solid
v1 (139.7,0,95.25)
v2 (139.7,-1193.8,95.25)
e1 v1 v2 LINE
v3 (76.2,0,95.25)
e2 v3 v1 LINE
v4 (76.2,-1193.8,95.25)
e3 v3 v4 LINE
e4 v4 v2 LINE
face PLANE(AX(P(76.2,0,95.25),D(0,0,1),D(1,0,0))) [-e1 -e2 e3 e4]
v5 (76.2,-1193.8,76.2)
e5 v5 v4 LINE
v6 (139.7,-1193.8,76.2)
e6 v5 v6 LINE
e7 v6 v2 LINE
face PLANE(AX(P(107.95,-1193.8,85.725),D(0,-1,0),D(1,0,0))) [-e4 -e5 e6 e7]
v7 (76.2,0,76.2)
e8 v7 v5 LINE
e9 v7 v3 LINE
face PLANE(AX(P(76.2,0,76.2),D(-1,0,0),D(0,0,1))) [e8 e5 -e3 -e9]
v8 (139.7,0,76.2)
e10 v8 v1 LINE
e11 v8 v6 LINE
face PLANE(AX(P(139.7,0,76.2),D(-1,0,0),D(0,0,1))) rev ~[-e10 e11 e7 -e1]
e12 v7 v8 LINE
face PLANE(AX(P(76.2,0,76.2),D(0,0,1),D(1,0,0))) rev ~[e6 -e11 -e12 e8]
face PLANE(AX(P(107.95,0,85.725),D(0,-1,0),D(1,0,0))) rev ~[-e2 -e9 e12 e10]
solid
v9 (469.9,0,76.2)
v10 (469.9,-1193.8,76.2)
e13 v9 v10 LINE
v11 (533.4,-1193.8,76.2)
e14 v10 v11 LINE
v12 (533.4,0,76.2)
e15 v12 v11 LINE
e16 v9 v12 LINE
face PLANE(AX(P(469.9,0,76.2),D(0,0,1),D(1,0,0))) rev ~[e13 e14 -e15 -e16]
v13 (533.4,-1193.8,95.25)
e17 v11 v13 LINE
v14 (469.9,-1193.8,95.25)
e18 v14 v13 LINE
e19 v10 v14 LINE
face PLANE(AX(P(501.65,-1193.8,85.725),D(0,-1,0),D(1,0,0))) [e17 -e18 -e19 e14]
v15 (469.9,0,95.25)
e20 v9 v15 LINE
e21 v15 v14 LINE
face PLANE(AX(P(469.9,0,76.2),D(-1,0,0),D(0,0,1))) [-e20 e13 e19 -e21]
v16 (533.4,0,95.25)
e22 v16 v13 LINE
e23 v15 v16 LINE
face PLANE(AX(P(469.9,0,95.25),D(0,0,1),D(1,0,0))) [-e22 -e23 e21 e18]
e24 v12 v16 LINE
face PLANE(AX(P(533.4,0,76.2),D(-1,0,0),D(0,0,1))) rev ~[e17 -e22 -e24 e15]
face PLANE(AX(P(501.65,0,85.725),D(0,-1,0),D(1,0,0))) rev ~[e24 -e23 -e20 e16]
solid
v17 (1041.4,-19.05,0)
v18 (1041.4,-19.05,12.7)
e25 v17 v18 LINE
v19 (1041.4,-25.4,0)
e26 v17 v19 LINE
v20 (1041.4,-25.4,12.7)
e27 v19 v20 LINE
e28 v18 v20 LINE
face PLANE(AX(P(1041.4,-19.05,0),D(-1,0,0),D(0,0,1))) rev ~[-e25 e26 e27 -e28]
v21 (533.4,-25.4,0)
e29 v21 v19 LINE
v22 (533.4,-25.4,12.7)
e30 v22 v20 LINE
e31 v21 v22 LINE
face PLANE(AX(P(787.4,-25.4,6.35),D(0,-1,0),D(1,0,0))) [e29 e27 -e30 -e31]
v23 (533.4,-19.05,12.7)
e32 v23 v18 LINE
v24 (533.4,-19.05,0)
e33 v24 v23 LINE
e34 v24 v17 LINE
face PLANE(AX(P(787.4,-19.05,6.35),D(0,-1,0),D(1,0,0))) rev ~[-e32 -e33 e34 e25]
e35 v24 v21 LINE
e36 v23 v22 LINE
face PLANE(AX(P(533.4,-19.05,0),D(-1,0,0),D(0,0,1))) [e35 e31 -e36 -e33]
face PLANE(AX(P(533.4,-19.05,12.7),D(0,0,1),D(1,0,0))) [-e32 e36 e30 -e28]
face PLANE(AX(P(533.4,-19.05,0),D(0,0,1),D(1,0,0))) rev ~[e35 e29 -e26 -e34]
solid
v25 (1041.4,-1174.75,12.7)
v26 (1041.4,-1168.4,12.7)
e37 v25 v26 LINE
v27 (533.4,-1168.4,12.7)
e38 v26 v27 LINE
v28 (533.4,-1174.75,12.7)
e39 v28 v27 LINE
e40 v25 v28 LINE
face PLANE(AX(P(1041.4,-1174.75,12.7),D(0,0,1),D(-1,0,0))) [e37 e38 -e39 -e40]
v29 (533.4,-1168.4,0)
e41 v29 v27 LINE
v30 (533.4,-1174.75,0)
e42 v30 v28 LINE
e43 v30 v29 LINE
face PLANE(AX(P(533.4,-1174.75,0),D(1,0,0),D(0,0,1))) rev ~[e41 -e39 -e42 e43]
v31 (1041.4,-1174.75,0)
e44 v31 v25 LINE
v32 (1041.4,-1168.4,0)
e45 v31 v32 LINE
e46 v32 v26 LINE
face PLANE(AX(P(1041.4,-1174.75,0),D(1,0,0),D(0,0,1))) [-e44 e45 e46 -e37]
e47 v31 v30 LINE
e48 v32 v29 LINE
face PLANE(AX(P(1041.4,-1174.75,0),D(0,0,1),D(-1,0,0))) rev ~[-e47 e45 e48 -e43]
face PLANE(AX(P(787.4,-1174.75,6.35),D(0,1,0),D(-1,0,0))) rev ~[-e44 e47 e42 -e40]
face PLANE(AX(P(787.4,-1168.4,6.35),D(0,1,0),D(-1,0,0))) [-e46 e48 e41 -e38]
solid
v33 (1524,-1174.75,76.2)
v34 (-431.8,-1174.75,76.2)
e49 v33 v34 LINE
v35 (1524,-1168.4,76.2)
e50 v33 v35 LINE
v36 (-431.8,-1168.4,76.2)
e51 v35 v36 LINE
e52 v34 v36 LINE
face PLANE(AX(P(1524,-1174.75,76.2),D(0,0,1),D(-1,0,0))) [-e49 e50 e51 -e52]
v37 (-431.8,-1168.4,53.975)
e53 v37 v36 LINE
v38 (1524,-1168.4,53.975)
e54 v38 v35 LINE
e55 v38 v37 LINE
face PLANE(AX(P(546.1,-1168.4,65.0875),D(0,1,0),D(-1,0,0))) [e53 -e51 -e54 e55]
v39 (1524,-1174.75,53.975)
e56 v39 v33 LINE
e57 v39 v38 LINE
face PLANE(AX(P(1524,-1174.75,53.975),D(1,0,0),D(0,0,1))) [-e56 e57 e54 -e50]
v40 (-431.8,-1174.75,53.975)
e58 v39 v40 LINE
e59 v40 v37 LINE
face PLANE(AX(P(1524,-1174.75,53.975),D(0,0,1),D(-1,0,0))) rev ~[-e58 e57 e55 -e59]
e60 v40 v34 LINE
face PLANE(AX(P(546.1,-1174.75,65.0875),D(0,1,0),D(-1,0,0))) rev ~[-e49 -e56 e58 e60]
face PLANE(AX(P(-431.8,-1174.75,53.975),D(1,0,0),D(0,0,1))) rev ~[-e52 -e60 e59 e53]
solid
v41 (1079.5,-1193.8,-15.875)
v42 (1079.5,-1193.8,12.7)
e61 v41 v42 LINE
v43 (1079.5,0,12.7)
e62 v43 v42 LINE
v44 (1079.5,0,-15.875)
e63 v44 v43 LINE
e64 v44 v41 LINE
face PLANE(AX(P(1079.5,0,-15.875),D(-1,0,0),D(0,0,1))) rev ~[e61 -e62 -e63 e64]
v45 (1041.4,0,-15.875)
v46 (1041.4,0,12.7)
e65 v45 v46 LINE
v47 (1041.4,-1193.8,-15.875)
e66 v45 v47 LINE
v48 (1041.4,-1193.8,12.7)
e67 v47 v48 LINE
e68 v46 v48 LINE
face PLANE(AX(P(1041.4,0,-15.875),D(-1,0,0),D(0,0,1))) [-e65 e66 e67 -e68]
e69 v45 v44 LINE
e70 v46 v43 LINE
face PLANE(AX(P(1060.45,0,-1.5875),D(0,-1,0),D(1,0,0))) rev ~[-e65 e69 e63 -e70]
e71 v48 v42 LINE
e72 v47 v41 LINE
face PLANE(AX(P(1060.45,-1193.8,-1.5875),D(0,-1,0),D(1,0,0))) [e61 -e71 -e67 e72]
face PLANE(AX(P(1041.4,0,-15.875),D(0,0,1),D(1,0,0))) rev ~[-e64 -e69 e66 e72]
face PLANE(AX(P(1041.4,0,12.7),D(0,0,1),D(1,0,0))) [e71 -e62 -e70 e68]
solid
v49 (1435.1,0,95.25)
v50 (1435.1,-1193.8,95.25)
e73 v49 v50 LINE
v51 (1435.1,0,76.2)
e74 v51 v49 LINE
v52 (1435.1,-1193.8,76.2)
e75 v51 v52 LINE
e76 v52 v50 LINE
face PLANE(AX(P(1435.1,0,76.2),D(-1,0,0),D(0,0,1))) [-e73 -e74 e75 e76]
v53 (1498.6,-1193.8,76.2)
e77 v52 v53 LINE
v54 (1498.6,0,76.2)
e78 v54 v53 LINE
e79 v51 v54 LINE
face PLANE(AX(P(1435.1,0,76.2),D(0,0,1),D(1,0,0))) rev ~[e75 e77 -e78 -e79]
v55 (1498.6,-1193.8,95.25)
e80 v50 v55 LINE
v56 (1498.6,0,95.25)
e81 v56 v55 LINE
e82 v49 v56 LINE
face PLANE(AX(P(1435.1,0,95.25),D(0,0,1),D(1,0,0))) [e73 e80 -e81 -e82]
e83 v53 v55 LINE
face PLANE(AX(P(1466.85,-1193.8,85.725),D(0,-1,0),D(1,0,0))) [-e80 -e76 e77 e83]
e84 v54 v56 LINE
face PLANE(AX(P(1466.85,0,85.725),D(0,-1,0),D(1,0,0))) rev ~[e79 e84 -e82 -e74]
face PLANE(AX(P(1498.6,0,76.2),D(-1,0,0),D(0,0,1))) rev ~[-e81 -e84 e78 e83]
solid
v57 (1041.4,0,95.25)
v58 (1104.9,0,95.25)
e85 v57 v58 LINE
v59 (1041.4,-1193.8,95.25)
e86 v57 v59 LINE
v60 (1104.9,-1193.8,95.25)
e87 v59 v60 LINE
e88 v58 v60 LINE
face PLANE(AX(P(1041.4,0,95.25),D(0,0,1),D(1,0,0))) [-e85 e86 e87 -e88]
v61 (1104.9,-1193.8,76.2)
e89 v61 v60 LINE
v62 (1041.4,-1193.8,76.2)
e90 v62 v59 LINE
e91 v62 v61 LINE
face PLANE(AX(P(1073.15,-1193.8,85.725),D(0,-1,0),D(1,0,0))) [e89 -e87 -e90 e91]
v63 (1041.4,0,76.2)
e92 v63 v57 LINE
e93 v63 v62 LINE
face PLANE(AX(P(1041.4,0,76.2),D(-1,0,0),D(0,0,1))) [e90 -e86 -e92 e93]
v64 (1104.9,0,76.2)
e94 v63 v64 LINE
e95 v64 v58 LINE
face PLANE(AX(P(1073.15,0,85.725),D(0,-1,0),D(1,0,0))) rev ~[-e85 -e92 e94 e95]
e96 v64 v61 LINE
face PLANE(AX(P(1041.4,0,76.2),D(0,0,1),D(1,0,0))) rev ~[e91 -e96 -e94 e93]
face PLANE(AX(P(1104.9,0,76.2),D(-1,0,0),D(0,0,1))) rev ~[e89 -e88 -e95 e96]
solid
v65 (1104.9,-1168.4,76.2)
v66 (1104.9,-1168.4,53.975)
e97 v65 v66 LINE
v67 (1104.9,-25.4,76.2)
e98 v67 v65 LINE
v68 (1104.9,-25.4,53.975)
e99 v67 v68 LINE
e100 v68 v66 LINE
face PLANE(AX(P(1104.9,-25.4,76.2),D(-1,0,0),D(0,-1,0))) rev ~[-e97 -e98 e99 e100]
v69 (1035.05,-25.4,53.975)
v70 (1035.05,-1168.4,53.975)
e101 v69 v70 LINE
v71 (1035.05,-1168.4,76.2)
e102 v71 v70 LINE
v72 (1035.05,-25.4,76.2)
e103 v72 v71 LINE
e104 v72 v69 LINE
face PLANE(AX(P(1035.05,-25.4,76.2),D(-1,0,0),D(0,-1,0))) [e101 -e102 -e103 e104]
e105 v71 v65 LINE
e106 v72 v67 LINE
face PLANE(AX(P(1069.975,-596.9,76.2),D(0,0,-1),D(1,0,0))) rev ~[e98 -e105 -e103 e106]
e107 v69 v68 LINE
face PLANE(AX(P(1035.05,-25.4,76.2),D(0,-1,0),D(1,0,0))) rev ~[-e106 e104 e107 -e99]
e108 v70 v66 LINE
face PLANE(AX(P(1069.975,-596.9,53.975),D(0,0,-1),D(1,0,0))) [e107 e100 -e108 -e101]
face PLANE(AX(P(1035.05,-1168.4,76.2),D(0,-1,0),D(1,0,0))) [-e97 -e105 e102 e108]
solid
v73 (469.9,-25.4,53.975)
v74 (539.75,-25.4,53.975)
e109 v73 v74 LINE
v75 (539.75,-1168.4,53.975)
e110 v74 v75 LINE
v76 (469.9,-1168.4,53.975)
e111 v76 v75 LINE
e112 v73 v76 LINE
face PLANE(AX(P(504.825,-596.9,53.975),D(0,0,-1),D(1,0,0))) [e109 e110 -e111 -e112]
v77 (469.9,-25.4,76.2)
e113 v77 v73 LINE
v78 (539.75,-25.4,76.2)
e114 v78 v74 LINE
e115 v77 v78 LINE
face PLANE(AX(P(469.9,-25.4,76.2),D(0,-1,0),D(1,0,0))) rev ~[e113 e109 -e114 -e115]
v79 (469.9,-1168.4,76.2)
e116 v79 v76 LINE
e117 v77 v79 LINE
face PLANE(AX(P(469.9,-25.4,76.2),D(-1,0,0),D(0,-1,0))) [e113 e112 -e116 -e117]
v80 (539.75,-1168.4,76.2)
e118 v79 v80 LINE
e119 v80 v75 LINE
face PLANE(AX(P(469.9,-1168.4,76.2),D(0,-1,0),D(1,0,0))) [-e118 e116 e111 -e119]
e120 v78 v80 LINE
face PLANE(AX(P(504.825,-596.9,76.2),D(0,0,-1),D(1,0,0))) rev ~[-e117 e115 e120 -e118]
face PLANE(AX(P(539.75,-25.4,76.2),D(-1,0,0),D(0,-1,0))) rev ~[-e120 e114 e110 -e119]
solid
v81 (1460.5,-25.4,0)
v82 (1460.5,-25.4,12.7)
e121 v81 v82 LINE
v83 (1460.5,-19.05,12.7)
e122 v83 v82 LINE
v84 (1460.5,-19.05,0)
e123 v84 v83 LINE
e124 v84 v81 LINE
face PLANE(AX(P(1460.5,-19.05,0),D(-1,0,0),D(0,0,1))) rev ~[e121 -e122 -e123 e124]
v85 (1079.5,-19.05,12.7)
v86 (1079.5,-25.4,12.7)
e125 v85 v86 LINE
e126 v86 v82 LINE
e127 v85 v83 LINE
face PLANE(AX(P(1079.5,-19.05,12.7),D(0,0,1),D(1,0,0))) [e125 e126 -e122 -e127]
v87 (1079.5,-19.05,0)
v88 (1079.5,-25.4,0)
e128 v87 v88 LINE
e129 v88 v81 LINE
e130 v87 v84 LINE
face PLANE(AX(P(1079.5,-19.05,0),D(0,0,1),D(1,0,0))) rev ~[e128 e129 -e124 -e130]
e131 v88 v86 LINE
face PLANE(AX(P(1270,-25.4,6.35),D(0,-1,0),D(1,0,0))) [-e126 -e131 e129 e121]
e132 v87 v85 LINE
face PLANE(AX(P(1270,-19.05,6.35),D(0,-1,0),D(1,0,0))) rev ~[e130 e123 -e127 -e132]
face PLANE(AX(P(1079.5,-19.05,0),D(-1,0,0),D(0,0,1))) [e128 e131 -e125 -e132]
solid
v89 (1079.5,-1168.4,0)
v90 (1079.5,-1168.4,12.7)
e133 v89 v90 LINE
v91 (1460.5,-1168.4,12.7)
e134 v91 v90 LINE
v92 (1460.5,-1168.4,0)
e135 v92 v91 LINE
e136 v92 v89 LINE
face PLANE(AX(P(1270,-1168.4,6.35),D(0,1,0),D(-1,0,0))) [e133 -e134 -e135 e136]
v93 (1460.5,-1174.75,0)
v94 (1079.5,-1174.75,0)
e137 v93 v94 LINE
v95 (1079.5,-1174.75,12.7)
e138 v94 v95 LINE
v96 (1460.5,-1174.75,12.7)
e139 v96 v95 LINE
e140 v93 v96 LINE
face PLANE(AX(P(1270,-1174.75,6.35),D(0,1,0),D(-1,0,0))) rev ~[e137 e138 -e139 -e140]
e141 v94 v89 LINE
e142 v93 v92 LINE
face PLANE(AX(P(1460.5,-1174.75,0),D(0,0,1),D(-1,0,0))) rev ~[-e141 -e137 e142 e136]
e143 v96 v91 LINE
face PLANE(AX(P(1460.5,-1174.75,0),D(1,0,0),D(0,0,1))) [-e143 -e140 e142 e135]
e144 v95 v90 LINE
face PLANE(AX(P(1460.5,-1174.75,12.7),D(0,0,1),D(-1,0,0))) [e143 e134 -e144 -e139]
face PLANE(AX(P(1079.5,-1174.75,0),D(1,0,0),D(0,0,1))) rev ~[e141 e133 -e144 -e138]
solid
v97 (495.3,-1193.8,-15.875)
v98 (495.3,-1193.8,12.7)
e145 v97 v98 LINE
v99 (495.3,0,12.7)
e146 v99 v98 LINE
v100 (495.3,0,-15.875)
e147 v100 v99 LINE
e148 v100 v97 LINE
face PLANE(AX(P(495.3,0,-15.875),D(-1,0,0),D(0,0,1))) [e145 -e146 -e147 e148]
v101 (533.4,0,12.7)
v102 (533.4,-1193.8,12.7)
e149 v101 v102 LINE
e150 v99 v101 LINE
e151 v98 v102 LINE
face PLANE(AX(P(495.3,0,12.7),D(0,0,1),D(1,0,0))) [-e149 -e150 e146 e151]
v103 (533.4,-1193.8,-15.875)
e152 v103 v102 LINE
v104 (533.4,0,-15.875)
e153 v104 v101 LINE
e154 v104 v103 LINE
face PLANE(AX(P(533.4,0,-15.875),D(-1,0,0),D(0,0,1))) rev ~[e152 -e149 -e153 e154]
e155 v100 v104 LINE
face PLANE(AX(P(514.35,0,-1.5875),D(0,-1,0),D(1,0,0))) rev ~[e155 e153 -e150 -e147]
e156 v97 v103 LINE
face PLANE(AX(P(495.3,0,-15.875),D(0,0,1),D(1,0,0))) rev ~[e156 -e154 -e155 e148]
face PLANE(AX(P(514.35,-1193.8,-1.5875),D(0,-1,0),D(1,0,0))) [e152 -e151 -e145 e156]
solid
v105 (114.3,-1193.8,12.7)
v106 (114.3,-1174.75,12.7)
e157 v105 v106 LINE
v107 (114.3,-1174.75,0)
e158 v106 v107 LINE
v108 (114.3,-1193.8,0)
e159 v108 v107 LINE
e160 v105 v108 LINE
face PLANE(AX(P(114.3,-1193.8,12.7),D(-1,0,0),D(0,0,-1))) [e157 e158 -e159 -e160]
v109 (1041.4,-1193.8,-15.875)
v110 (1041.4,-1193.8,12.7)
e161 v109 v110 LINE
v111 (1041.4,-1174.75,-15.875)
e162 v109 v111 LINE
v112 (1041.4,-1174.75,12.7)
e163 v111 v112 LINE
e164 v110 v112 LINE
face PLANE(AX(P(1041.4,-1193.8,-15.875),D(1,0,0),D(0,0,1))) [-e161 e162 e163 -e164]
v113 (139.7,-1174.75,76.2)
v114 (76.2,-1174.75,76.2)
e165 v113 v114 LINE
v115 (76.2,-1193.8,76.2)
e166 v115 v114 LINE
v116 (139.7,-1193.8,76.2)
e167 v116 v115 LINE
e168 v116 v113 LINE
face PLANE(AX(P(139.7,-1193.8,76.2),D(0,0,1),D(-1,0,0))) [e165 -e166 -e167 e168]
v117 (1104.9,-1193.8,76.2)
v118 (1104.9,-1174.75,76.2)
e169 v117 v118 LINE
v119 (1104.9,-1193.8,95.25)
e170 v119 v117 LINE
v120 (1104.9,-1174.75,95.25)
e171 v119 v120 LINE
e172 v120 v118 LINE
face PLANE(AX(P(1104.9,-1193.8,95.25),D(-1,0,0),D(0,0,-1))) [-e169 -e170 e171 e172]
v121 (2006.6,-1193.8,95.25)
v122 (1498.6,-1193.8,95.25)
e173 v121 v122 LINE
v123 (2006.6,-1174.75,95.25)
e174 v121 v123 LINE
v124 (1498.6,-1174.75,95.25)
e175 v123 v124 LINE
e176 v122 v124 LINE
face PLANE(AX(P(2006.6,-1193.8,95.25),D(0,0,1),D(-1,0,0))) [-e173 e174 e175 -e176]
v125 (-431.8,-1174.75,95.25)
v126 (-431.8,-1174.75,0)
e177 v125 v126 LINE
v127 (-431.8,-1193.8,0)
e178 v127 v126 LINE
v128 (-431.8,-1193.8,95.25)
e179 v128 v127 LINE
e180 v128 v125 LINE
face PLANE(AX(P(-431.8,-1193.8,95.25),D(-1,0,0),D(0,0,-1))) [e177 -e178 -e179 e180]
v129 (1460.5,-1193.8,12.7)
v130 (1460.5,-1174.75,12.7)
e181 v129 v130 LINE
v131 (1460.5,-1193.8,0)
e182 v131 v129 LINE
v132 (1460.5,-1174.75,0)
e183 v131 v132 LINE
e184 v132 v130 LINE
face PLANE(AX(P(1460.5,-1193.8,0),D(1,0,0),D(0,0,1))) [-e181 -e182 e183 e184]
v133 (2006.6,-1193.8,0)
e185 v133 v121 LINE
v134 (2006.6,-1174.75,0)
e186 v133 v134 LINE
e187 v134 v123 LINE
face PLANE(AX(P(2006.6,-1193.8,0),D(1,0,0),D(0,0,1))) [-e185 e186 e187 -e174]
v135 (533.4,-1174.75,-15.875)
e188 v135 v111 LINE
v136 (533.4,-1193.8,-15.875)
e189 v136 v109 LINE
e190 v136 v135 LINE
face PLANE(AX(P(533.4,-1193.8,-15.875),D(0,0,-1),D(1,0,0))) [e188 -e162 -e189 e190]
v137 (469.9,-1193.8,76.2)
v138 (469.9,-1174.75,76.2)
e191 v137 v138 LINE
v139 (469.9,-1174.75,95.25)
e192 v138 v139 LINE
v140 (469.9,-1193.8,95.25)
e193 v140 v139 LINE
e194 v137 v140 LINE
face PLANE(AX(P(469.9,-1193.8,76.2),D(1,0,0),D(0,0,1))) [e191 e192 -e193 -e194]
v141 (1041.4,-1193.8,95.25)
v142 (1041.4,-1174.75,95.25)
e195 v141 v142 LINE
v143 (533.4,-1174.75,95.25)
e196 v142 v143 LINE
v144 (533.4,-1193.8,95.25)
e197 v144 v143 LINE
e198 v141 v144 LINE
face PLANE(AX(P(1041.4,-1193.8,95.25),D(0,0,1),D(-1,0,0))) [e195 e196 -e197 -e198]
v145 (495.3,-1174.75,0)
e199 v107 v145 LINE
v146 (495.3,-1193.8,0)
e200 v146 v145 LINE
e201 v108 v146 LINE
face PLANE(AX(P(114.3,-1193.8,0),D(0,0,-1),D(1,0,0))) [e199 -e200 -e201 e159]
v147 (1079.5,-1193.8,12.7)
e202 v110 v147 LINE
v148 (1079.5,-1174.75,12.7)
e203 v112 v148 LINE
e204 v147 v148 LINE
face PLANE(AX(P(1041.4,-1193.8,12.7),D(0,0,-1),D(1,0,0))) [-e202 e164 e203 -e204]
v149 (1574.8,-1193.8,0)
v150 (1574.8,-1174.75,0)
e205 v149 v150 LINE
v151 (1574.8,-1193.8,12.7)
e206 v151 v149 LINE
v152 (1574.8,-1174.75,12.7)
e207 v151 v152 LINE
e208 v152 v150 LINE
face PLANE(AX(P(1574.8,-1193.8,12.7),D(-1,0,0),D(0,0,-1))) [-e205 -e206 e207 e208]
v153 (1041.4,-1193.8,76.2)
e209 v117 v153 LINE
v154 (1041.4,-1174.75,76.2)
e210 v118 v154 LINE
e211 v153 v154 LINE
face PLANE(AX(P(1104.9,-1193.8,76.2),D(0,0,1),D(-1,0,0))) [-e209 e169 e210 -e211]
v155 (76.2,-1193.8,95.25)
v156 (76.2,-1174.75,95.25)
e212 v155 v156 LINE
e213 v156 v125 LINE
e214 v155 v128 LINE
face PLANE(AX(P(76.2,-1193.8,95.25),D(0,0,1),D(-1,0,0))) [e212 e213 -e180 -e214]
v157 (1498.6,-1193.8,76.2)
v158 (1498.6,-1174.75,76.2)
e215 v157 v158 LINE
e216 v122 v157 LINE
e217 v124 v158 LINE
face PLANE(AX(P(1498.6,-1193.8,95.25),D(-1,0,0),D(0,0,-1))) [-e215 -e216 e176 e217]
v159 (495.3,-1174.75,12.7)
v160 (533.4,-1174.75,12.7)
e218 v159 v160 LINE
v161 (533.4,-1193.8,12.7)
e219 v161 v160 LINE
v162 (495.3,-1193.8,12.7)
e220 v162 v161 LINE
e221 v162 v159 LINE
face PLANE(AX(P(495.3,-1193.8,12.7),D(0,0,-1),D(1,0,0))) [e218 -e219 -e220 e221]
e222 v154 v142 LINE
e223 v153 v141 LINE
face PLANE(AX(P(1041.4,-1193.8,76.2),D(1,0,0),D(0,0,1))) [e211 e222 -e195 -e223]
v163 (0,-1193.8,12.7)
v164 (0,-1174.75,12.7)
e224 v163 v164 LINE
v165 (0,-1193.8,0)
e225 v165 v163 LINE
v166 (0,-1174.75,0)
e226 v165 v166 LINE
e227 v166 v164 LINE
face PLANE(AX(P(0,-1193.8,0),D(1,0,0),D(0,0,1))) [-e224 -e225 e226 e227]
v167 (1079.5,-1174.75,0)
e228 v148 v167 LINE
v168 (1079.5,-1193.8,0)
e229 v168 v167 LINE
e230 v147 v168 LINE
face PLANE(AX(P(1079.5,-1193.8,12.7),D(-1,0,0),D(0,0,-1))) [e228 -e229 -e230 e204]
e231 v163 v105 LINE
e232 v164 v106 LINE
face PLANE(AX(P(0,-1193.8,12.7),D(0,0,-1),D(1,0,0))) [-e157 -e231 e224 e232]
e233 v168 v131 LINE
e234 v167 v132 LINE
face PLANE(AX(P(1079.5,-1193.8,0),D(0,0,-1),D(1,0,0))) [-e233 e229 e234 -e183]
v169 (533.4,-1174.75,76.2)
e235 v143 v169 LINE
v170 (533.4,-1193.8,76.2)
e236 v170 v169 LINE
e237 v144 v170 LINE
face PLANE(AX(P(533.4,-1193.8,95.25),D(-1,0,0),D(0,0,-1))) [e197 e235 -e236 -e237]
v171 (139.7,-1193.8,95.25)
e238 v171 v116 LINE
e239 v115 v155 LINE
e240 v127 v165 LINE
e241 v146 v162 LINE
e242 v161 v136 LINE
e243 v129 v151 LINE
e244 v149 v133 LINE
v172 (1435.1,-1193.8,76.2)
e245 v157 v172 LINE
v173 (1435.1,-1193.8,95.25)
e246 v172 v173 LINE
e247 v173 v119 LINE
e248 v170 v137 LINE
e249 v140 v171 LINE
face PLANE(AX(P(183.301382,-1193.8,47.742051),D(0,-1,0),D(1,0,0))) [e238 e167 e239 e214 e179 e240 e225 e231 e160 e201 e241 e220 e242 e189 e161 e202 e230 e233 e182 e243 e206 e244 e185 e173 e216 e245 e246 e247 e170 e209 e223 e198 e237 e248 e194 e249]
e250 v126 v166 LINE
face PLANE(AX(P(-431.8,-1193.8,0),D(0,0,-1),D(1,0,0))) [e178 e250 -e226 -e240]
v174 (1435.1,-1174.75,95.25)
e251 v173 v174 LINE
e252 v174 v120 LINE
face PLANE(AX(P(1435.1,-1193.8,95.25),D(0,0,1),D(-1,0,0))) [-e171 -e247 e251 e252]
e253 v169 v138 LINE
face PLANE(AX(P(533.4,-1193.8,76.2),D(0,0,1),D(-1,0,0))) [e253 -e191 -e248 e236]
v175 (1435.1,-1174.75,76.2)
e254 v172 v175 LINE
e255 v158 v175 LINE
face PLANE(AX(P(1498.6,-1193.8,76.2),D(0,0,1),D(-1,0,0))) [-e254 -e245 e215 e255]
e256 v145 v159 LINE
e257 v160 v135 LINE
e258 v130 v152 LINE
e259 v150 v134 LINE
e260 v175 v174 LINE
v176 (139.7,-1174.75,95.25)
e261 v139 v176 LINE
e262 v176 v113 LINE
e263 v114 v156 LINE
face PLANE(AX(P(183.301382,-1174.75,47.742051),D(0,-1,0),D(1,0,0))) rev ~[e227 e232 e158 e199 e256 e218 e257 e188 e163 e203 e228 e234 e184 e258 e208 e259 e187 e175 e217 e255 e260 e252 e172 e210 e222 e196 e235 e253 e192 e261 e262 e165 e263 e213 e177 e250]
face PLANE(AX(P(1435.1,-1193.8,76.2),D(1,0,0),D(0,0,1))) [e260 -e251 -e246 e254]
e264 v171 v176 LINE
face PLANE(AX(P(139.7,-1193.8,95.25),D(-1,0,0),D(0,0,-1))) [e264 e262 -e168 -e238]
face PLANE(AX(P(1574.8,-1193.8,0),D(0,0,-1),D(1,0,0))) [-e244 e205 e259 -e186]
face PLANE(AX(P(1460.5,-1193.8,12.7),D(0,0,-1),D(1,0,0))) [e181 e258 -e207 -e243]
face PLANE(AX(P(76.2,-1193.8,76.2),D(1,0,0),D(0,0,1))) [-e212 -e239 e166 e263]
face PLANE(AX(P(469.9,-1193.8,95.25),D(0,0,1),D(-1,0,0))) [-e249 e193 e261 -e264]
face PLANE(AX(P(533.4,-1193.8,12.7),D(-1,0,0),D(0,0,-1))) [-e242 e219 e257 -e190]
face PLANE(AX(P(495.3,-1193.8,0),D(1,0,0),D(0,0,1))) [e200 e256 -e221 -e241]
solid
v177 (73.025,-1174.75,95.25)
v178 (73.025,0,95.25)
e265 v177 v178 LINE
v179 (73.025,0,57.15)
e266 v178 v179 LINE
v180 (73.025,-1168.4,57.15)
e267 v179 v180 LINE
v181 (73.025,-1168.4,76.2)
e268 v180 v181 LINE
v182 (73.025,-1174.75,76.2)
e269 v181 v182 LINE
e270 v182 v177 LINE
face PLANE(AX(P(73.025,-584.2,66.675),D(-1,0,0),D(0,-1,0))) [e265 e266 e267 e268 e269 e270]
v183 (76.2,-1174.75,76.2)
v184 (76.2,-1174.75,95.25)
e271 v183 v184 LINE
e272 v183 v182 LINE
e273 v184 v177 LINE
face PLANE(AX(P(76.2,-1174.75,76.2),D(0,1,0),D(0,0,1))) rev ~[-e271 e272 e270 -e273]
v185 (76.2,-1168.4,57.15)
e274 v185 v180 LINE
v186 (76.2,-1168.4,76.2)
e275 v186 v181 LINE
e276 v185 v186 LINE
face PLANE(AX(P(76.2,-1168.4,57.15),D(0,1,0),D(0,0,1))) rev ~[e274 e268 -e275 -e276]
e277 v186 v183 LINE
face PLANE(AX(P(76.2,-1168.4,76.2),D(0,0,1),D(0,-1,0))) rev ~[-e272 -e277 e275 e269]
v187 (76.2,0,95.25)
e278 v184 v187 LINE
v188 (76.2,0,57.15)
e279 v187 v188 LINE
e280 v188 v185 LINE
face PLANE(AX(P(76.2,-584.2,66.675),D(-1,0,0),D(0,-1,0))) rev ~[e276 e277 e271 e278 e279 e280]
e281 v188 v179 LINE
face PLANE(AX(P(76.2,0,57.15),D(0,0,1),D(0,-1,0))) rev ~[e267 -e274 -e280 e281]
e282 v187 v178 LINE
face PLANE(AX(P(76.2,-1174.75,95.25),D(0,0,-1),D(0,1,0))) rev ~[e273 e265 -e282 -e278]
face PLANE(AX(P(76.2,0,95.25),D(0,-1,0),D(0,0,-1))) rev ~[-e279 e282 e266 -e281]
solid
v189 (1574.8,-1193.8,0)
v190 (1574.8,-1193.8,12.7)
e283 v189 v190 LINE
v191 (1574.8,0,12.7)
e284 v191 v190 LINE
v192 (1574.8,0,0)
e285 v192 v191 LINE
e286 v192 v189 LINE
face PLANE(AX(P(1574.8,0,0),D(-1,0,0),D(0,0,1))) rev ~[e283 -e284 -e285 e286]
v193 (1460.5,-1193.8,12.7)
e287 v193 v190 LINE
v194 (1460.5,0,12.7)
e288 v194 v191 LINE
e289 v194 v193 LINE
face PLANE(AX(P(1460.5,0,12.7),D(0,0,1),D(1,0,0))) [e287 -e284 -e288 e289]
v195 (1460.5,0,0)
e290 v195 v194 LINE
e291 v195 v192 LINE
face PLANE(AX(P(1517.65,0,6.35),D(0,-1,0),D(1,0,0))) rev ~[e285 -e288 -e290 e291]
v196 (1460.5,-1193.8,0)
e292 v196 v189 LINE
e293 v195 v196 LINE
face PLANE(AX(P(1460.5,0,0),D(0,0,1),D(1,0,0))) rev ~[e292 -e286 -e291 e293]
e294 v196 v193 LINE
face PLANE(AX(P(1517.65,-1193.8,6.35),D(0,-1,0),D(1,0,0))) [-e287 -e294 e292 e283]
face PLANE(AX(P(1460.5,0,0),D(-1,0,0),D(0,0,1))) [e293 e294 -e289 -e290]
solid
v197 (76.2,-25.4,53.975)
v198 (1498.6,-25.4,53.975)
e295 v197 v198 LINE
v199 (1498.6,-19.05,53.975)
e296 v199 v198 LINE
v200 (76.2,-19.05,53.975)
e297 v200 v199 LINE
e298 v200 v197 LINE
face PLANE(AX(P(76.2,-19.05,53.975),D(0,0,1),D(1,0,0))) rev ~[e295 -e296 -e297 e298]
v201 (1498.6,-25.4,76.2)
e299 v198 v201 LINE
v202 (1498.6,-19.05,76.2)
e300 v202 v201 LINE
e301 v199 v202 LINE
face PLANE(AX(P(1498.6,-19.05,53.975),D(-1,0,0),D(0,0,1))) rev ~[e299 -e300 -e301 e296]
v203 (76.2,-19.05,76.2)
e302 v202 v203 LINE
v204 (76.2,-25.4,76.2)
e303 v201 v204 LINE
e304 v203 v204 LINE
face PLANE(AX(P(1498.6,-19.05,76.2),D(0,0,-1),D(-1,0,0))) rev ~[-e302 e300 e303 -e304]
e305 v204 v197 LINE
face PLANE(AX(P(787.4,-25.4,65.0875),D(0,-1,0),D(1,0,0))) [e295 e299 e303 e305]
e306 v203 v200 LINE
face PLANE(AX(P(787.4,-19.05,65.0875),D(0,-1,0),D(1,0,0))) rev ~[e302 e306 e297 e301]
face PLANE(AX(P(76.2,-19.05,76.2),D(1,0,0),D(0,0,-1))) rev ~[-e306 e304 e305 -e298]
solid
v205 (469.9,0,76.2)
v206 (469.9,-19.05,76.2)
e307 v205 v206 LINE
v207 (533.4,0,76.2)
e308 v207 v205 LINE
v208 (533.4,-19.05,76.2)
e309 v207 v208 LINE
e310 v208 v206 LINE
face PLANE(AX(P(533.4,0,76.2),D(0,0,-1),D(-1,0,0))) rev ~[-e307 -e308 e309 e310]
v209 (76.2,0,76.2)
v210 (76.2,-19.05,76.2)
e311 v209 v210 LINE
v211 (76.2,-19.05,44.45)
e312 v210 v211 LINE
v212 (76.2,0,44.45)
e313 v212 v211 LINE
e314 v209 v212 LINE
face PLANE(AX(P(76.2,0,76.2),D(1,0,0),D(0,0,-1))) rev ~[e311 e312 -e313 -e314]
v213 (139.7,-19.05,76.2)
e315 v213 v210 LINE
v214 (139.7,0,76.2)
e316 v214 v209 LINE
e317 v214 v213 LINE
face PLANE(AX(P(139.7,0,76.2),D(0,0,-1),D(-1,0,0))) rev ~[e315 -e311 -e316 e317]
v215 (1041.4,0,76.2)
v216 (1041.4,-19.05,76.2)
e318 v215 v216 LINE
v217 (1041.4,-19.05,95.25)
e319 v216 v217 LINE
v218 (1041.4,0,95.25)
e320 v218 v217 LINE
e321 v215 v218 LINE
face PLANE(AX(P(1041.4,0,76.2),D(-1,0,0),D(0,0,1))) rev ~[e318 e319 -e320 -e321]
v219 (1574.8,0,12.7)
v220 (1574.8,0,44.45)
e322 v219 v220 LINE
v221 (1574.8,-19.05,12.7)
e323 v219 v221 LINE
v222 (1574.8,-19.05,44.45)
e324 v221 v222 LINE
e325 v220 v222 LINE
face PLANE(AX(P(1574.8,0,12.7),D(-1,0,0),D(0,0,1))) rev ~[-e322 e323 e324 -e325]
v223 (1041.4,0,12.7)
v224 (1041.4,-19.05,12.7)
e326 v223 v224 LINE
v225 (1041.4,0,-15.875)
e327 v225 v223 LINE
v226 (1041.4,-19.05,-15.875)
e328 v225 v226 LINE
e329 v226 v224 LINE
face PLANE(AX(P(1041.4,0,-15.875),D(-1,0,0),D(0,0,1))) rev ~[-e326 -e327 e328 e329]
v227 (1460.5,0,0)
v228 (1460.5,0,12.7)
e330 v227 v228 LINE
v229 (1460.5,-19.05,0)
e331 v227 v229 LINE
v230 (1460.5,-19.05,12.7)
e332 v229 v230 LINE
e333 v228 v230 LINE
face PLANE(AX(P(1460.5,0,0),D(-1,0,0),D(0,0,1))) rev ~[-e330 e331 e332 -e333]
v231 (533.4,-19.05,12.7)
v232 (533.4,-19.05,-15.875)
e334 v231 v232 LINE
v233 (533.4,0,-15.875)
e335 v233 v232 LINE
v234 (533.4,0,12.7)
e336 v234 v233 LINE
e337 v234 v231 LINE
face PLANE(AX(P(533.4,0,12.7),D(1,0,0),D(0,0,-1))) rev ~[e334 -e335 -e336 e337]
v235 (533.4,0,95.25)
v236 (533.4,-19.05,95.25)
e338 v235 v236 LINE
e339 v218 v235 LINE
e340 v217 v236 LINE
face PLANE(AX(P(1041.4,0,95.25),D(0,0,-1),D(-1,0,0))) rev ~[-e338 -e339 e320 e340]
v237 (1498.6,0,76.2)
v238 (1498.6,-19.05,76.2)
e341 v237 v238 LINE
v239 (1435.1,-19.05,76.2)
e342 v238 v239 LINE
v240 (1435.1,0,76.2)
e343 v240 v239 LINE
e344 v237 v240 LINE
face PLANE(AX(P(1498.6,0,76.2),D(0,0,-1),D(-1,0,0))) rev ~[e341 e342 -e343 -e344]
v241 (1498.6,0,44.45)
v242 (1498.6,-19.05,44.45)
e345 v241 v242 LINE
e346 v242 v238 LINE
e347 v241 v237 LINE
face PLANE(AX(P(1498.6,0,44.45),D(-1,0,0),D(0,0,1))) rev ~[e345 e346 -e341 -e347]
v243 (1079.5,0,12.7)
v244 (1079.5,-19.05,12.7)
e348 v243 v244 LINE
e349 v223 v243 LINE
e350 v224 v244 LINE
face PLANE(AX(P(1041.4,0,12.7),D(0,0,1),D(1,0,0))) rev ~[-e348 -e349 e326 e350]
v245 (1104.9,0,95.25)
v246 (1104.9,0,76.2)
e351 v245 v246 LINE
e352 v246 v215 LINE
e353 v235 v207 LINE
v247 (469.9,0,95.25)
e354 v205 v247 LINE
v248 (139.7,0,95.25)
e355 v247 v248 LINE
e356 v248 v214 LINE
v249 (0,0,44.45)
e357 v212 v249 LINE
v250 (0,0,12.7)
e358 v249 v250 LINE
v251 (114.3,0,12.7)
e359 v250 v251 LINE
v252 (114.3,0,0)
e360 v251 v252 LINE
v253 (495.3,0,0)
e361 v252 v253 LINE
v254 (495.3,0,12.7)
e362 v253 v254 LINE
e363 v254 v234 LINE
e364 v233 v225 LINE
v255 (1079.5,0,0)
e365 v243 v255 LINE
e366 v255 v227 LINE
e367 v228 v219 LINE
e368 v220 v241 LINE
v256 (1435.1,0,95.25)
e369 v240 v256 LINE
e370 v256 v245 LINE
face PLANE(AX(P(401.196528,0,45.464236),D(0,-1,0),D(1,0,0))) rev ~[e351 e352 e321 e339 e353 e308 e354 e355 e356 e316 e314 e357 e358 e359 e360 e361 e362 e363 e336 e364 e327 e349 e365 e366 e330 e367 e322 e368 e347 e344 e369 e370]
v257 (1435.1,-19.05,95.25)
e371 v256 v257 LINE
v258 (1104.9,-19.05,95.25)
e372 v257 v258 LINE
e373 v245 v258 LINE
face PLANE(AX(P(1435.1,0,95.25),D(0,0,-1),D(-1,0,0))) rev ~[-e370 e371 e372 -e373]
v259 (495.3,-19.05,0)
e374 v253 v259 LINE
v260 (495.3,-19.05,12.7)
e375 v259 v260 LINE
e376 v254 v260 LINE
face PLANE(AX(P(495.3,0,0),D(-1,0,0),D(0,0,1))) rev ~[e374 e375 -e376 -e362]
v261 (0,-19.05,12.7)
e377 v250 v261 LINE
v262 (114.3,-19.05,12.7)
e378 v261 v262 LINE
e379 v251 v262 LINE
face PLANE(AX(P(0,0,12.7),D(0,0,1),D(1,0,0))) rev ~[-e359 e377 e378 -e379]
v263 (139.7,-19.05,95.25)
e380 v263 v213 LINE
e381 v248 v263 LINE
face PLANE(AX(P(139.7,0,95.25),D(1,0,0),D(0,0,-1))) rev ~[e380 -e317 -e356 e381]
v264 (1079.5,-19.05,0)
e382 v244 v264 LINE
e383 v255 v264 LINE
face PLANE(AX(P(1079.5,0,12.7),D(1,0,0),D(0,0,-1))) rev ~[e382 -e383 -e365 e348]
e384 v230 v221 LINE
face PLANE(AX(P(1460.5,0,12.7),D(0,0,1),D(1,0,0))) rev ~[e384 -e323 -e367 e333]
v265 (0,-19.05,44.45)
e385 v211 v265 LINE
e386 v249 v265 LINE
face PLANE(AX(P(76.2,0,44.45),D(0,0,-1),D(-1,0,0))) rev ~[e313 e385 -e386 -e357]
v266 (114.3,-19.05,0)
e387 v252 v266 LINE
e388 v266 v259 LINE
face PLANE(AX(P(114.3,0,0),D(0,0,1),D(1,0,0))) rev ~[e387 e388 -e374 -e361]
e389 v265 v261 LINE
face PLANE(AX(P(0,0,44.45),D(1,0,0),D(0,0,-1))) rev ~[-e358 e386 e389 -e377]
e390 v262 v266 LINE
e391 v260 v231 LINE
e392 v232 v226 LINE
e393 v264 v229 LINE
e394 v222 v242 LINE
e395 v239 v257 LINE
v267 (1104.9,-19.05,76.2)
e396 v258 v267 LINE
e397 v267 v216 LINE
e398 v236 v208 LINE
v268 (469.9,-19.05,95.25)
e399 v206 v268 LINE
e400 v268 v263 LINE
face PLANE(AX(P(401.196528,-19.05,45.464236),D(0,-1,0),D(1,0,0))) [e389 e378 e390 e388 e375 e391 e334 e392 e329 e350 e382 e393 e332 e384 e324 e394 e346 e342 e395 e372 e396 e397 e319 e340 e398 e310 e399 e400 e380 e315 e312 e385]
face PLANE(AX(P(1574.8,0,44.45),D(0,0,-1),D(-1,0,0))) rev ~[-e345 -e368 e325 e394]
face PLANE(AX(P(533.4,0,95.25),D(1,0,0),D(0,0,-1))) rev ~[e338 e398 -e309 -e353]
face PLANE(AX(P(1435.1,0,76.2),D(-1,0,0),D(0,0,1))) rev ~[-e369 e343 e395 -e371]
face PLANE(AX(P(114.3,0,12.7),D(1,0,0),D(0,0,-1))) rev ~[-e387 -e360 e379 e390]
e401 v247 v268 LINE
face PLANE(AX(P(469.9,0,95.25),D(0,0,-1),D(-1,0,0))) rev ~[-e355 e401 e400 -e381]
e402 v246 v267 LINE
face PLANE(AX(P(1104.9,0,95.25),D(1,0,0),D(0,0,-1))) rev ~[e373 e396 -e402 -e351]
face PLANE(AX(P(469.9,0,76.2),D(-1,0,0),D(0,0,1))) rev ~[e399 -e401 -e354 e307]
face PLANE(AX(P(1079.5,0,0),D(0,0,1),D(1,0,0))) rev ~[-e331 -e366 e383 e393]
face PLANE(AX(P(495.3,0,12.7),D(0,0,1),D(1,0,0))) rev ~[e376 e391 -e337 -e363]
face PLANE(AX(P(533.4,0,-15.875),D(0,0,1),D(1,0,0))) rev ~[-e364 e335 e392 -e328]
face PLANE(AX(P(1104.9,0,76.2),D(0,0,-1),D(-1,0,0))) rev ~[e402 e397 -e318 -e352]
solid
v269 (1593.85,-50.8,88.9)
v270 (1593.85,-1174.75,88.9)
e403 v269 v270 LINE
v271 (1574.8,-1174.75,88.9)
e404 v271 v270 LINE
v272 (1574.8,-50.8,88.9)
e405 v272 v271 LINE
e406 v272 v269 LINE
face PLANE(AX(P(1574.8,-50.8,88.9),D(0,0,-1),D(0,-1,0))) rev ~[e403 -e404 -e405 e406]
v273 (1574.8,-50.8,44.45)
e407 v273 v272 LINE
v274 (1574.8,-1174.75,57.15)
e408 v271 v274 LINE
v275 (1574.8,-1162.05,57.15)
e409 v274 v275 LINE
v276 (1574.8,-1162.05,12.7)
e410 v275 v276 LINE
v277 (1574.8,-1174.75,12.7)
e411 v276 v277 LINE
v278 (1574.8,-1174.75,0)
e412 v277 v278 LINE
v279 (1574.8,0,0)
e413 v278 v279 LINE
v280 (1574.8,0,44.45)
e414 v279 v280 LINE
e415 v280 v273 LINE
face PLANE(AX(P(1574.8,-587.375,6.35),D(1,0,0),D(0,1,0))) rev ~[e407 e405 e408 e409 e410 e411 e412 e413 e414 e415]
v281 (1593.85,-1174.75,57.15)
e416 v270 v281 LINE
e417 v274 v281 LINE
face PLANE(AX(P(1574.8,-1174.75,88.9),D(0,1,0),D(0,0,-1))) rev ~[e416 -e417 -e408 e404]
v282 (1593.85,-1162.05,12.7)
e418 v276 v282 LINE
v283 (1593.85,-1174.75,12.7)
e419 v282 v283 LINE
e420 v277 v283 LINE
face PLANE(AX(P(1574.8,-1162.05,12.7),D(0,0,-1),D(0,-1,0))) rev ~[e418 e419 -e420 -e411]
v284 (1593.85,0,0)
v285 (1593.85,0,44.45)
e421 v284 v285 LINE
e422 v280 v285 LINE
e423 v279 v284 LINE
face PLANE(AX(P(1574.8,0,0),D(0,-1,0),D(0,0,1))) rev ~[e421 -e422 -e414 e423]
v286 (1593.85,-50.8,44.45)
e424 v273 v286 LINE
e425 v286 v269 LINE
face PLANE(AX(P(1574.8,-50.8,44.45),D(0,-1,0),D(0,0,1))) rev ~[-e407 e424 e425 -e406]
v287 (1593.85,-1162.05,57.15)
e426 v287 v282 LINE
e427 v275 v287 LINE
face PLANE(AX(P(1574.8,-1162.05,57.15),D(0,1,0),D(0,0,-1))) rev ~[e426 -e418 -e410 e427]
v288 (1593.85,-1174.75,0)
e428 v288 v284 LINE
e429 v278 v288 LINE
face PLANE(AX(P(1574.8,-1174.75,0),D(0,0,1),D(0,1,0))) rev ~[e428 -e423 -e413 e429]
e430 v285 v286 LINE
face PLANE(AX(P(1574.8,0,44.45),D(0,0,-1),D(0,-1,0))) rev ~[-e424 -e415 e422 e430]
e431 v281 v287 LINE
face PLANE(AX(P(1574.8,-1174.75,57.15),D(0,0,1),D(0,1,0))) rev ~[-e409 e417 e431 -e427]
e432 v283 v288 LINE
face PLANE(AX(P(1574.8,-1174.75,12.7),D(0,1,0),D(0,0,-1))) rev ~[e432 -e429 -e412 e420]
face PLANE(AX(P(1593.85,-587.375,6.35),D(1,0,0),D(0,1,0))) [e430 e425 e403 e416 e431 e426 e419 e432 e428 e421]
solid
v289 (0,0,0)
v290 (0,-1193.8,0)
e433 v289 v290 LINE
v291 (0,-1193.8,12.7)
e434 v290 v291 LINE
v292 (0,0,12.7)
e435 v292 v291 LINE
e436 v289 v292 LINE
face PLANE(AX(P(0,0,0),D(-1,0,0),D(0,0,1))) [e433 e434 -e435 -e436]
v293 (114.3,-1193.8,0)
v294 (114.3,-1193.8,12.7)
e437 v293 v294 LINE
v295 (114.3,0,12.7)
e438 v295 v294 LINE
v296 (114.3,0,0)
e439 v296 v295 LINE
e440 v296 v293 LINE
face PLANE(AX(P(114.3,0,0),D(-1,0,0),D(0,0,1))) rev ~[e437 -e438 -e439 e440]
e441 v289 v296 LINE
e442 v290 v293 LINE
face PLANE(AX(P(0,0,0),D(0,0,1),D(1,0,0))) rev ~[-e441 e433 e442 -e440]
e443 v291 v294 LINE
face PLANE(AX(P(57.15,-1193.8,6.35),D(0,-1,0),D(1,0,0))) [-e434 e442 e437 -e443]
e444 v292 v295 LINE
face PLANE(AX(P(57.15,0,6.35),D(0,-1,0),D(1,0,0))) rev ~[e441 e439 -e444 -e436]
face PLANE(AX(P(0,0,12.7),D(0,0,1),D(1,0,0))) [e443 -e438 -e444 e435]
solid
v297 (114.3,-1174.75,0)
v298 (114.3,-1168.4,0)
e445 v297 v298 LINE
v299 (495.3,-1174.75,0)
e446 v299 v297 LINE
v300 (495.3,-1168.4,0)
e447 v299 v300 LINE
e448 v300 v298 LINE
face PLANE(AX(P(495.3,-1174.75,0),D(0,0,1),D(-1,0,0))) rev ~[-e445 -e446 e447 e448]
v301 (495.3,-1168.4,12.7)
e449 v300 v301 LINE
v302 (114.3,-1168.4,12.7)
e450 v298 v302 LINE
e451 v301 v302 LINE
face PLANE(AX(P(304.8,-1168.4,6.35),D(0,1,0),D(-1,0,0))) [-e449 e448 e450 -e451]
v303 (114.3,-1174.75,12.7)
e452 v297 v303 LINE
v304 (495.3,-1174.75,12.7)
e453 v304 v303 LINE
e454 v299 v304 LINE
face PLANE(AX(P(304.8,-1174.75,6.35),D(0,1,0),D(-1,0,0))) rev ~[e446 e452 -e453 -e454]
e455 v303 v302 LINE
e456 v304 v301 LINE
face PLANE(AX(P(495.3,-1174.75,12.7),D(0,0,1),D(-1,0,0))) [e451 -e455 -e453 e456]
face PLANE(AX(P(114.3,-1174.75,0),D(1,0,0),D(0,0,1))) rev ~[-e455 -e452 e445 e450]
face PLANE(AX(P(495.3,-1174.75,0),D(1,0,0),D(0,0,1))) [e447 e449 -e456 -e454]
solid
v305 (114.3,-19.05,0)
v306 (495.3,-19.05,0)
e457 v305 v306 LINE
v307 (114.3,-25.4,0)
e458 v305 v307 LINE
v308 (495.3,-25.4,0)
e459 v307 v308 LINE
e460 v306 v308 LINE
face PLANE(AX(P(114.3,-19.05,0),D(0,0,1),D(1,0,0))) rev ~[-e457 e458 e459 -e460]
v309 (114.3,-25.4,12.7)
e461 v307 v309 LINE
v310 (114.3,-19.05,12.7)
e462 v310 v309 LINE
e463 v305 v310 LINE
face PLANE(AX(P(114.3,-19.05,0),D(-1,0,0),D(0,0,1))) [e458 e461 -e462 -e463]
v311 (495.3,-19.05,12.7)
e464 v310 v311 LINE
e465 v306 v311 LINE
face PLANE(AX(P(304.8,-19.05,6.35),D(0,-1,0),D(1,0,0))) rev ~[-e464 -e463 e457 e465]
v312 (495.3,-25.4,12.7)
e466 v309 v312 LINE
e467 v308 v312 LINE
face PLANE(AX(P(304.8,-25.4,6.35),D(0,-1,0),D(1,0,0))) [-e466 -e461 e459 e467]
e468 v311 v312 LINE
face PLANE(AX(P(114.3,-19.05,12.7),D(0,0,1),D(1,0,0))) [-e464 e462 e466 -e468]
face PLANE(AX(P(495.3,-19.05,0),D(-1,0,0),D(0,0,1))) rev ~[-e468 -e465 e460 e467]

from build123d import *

# Parameters (mm, degrees)
F0_W      = 254
F0_H      = 15.875
F1_DEPTH  = 19.05
F2_W      = 381
F2_H      = 12.7
F3_DEPTH  = 6.35
F2_W_2    = 508
F5_DEPTH  = 6.35
F6_W      = 63.5
F6_H      = 19.05
F7_DEPTH  = 1193.8
F6_W_2    = 114.3
F6_H_2    = 12.7
F6_W_3    = 38.1
F6_H_3    = 28.575
F9_DEPTH  = 19.05
F10_W     = 1955.8
F10_H     = 22.225
F11_DEPTH = 6.35
F12_W     = 381
F12_H     = 12.7
F13_DEPTH = 6.35
F12_W_2   = 508
F14_W     = 69.85
F14_H     = 1143
F15_DEPTH = 22.225
F16_W     = 69.85
F16_H     = 1143
F17_DEPTH = 22.225
F18_W     = 1168.4
F18_H     = 19.05
F19_DEPTH = 3.175
F21_DEPTH = 19.05


# Not quite as in the source:
# - a feature names something its author has since deleted; it is built from what else it names


with BuildPart() as f1:
    # F0 (on Front) → F1 (new body)
    with BuildSketch(Plane.XZ):
        Polygon((114.3, 12.7), (114.3, 0), (495.3, 0), (495.3, 12.7), (533.4, 12.7), (533.4, 0), (787.4, 0), (787.4, 95.25), (533.4, 95.25), (533.4, 76.2), (469.9, 76.2), (469.9, 95.25), (139.7, 95.25), (139.7, 76.2), (76.2, 76.2), (76.2, 44.45), (0, 44.45), (0, 12.7), align=None)
        Polygon((787.4, 95.25), (787.4, 0), (1041.4, 0), (1041.4, 12.7), (1079.5, 12.7), (1079.5, 0), (1460.5, 0), (1460.5, 12.7), (1574.8, 12.7), (1574.8, 44.45), (1498.6, 44.45), (1498.6, 76.2), (1435.1, 76.2), (1435.1, 95.25), (1104.9, 95.25), (1104.9, 76.2), (1041.4, 76.2), (1041.4, 95.25), align=None)
        with Locations((660.4, -7.9375)):
            Rectangle(F0_W, F0_H)
        with Locations((914.4, -7.9375)):
            Rectangle(F0_W, F0_H)
    extrude(amount=F1_DEPTH)


with BuildPart() as f3:
    # F2 (on face) → F3 (new body)
    with BuildSketch(Plane.XZ.offset(19.05)):
        with Locations((304.8, 6.35)):
            Rectangle(F2_W, F2_H)
    extrude(amount=F3_DEPTH)


with BuildPart() as f3b:
    # F2 (on face) → F3, piece 2 (new body)
    with BuildSketch(Plane.XZ.offset(19.05)):
        with Locations((1270, 6.35)):
            Rectangle(F2_W, F2_H)
    extrude(amount=F3_DEPTH)


with BuildPart() as f3c:
    # F2 (on face) → F3, piece 3 (new body)
    with BuildSketch(Plane.XZ.offset(19.05)):
        with Locations((787.4, 6.35)):
            Rectangle(F2_W_2, F2_H)
    extrude(amount=F3_DEPTH)


with BuildPart() as f5:
    # F4 (on face) → F5 (new body)
    with BuildSketch(Plane.XZ.offset(19.05)):
        Polygon((76.2, 76.2), (76.2, 53.975), (1498.6, 53.975), (1498.6, 76.2), (1435.1, 76.2), (1104.9, 76.2), (1041.4, 76.2), (533.4, 76.2), (469.9, 76.2), (139.7, 76.2), align=None)
    extrude(amount=F5_DEPTH)


with BuildPart() as f7:
    # F6 (on Front) → F7 (new body)
    with BuildSketch(Plane.XZ):
        with Locations((107.95, 85.725)):
            Rectangle(F6_W, F6_H)
    extrude(amount=F7_DEPTH)


with BuildPart() as f7b:
    # F6 (on Front) → F7, piece 2 (new body)
    with BuildSketch(Plane.XZ):
        with Locations((501.65, 85.725)):
            Rectangle(F6_W, F6_H)
    extrude(amount=F7_DEPTH)


with BuildPart() as f7c:
    # F6 (on Front) → F7, piece 3 (new body)
    with BuildSketch(Plane.XZ):
        with Locations((1466.85, 85.725)):
            Rectangle(F6_W, F6_H)
    extrude(amount=F7_DEPTH)


with BuildPart() as f7d:
    # F6 (on Front) → F7, piece 4 (new body)
    with BuildSketch(Plane.XZ):
        with Locations((1073.15, 85.725)):
            Rectangle(F6_W, F6_H)
    extrude(amount=F7_DEPTH)


with BuildPart() as f7e:
    # F6 (on Front) → F7, piece 5 (new body)
    with BuildSketch(Plane.XZ):
        with Locations((1517.65, 6.35)):
            Rectangle(F6_W_2, F6_H_2)
    extrude(amount=F7_DEPTH)


with BuildPart() as f7f:
    # F6 (on Front) → F7, piece 6 (new body)
    with BuildSketch(Plane.XZ):
        with Locations((57.15, 6.35)):
            Rectangle(F6_W_2, F6_H_2)
    extrude(amount=F7_DEPTH)


with BuildPart() as f7g:
    # F6 (on Front) → F7, piece 7 (new body)
    with BuildSketch(Plane.XZ):
        with Locations((514.35, -1.5875)):
            Rectangle(F6_W_3, F6_H_3)
    extrude(amount=F7_DEPTH)


with BuildPart() as f7h:
    # F6 (on Front) → F7, piece 8 (new body)
    with BuildSketch(Plane.XZ):
        with Locations((1060.45, -1.5875)):
            Rectangle(F6_W_3, F6_H_3)
    extrude(amount=F7_DEPTH)


with BuildPart() as f9:
    # F8 (on face) → F9 (new body)
    with BuildSketch(Plane.XZ.offset(1193.8)):
        Polygon((469.9, 95.25), (292.1, 95.25), (139.7, 95.25), (139.7, 76.2), (76.2, 76.2), (76.2, 95.25), (-431.8, 95.25), (-431.8, 0), (0, 0), (0, 12.7), (114.3, 12.7), (114.3, 0), (317.5, 0), (495.3, 0), (495.3, 12.7), (533.4, 12.7), (533.4, 0), (787.4, 0), (787.4, 95.25), (533.4, 95.25), (533.4, 76.2), (469.9, 76.2), align=None)
        Polygon((1041.4, 95.25), (787.4, 95.25), (787.4, 0), (1041.4, 0), (1041.4, 12.7), (1079.5, 12.7), (1079.5, 0), (1257.3, 0), (1460.5, 0), (1460.5, 12.7), (1574.8, 12.7), (1574.8, 0), (2006.6, 0), (2006.6, 95.25), (1498.6, 95.25), (1498.6, 76.2), (1435.1, 76.2), (1435.1, 95.25), (1282.7, 95.25), (1104.9, 95.25), (1104.9, 76.2), (1041.4, 76.2), align=None)
        Polygon((1041.4, 0), (787.4, 0), (533.4, 0), (533.4, -15.875), (1041.4, -15.875), align=None)
    extrude(amount=-F9_DEPTH)


with BuildPart() as f11:
    # F10 (on face) → F11 (new body)
    with BuildSketch(Plane(origin=(0, -1174.75, 0), x_dir=(-1, 0, 0), z_dir=(0, 1, 0))):
        with Locations((-546.1, 65.0875)):
            Rectangle(F10_W, F10_H)
    extrude(amount=F11_DEPTH)


with BuildPart() as f13:
    # F12 (on face) → F13 (new body)
    with BuildSketch(Plane(origin=(0, -1174.75, 0), x_dir=(-1, 0, 0), z_dir=(0, 1, 0))):
        with Locations((-1270, 6.35)):
            Rectangle(F12_W, F12_H)
    extrude(amount=F13_DEPTH)


with BuildPart() as f13b:
    # F12 (on face) → F13, piece 2 (new body)
    with BuildSketch(Plane(origin=(0, -1174.75, 0), x_dir=(-1, 0, 0), z_dir=(0, 1, 0))):
        with Locations((-304.8, 6.35)):
            Rectangle(F12_W, F12_H)
    extrude(amount=F13_DEPTH)


with BuildPart() as f13c:
    # F12 (on face) → F13, piece 3 (new body)
    with BuildSketch(Plane(origin=(0, -1174.75, 0), x_dir=(-1, 0, 0), z_dir=(0, 1, 0))):
        with Locations((-787.4, 6.35)):
            Rectangle(F12_W_2, F12_H)
    extrude(amount=F13_DEPTH)


with BuildPart() as f15:
    # F14 (on face) → F15 (new body)
    with BuildSketch(Plane(origin=(0, 0, 76.2), x_dir=(1, 0, 0), z_dir=(0, 0, -1))):
        with Locations((1069.975, 596.9)):
            Rectangle(F14_W, F14_H)
    extrude(amount=F15_DEPTH)


with BuildPart() as f17:
    # F16 (on face) → F17 (new body)
    with BuildSketch(Plane(origin=(0, 0, 76.2), x_dir=(1, 0, 0), z_dir=(0, 0, -1))):
        with Locations((504.825, 596.9)):
            Rectangle(F16_W, F16_H)
    extrude(amount=F17_DEPTH)


with BuildPart() as f19:
    # F18 (on face) → F19 (new body)
    with BuildSketch(Plane(origin=(76.2, 0, 0), x_dir=(0, -1, 0), z_dir=(-1, 0, 0))):
        with Locations((584.2, 66.675)):
            Rectangle(F18_W, F18_H)
        Polygon((1174.75, 76.2), (1174.75, 95.25), (0, 95.25), (0, 76.2), (1168.4, 76.2), align=None)
    extrude(amount=F19_DEPTH)


with BuildPart() as f21:
    # F20 (on face) → F21 (new body)
    with BuildSketch(Plane.YZ.offset(1574.8)):
        Polygon((-1162.05, 12.7), (-1174.75, 12.7), (-1174.75, 0), (0, 0), (0, 12.7), align=None)
        Polygon((-50.8, 88.9), (-1174.75, 88.9), (-1174.75, 57.15), (-1162.05, 57.15), (-1162.05, 12.7), (0, 12.7), (0, 44.45), (-50.8, 44.45), align=None)
    extrude(amount=F21_DEPTH)


solid = Compound([f1.part, f3.part, f3b.part, f3c.part, f5.part, f7.part, f7b.part, f7c.part, f7d.part, f7e.part, f7f.part, f7g.part, f7h.part, f9.part, f11.part, f13.part, f13b.part, f13c.part, f15.part, f17.part, f19.part, f21.part])
